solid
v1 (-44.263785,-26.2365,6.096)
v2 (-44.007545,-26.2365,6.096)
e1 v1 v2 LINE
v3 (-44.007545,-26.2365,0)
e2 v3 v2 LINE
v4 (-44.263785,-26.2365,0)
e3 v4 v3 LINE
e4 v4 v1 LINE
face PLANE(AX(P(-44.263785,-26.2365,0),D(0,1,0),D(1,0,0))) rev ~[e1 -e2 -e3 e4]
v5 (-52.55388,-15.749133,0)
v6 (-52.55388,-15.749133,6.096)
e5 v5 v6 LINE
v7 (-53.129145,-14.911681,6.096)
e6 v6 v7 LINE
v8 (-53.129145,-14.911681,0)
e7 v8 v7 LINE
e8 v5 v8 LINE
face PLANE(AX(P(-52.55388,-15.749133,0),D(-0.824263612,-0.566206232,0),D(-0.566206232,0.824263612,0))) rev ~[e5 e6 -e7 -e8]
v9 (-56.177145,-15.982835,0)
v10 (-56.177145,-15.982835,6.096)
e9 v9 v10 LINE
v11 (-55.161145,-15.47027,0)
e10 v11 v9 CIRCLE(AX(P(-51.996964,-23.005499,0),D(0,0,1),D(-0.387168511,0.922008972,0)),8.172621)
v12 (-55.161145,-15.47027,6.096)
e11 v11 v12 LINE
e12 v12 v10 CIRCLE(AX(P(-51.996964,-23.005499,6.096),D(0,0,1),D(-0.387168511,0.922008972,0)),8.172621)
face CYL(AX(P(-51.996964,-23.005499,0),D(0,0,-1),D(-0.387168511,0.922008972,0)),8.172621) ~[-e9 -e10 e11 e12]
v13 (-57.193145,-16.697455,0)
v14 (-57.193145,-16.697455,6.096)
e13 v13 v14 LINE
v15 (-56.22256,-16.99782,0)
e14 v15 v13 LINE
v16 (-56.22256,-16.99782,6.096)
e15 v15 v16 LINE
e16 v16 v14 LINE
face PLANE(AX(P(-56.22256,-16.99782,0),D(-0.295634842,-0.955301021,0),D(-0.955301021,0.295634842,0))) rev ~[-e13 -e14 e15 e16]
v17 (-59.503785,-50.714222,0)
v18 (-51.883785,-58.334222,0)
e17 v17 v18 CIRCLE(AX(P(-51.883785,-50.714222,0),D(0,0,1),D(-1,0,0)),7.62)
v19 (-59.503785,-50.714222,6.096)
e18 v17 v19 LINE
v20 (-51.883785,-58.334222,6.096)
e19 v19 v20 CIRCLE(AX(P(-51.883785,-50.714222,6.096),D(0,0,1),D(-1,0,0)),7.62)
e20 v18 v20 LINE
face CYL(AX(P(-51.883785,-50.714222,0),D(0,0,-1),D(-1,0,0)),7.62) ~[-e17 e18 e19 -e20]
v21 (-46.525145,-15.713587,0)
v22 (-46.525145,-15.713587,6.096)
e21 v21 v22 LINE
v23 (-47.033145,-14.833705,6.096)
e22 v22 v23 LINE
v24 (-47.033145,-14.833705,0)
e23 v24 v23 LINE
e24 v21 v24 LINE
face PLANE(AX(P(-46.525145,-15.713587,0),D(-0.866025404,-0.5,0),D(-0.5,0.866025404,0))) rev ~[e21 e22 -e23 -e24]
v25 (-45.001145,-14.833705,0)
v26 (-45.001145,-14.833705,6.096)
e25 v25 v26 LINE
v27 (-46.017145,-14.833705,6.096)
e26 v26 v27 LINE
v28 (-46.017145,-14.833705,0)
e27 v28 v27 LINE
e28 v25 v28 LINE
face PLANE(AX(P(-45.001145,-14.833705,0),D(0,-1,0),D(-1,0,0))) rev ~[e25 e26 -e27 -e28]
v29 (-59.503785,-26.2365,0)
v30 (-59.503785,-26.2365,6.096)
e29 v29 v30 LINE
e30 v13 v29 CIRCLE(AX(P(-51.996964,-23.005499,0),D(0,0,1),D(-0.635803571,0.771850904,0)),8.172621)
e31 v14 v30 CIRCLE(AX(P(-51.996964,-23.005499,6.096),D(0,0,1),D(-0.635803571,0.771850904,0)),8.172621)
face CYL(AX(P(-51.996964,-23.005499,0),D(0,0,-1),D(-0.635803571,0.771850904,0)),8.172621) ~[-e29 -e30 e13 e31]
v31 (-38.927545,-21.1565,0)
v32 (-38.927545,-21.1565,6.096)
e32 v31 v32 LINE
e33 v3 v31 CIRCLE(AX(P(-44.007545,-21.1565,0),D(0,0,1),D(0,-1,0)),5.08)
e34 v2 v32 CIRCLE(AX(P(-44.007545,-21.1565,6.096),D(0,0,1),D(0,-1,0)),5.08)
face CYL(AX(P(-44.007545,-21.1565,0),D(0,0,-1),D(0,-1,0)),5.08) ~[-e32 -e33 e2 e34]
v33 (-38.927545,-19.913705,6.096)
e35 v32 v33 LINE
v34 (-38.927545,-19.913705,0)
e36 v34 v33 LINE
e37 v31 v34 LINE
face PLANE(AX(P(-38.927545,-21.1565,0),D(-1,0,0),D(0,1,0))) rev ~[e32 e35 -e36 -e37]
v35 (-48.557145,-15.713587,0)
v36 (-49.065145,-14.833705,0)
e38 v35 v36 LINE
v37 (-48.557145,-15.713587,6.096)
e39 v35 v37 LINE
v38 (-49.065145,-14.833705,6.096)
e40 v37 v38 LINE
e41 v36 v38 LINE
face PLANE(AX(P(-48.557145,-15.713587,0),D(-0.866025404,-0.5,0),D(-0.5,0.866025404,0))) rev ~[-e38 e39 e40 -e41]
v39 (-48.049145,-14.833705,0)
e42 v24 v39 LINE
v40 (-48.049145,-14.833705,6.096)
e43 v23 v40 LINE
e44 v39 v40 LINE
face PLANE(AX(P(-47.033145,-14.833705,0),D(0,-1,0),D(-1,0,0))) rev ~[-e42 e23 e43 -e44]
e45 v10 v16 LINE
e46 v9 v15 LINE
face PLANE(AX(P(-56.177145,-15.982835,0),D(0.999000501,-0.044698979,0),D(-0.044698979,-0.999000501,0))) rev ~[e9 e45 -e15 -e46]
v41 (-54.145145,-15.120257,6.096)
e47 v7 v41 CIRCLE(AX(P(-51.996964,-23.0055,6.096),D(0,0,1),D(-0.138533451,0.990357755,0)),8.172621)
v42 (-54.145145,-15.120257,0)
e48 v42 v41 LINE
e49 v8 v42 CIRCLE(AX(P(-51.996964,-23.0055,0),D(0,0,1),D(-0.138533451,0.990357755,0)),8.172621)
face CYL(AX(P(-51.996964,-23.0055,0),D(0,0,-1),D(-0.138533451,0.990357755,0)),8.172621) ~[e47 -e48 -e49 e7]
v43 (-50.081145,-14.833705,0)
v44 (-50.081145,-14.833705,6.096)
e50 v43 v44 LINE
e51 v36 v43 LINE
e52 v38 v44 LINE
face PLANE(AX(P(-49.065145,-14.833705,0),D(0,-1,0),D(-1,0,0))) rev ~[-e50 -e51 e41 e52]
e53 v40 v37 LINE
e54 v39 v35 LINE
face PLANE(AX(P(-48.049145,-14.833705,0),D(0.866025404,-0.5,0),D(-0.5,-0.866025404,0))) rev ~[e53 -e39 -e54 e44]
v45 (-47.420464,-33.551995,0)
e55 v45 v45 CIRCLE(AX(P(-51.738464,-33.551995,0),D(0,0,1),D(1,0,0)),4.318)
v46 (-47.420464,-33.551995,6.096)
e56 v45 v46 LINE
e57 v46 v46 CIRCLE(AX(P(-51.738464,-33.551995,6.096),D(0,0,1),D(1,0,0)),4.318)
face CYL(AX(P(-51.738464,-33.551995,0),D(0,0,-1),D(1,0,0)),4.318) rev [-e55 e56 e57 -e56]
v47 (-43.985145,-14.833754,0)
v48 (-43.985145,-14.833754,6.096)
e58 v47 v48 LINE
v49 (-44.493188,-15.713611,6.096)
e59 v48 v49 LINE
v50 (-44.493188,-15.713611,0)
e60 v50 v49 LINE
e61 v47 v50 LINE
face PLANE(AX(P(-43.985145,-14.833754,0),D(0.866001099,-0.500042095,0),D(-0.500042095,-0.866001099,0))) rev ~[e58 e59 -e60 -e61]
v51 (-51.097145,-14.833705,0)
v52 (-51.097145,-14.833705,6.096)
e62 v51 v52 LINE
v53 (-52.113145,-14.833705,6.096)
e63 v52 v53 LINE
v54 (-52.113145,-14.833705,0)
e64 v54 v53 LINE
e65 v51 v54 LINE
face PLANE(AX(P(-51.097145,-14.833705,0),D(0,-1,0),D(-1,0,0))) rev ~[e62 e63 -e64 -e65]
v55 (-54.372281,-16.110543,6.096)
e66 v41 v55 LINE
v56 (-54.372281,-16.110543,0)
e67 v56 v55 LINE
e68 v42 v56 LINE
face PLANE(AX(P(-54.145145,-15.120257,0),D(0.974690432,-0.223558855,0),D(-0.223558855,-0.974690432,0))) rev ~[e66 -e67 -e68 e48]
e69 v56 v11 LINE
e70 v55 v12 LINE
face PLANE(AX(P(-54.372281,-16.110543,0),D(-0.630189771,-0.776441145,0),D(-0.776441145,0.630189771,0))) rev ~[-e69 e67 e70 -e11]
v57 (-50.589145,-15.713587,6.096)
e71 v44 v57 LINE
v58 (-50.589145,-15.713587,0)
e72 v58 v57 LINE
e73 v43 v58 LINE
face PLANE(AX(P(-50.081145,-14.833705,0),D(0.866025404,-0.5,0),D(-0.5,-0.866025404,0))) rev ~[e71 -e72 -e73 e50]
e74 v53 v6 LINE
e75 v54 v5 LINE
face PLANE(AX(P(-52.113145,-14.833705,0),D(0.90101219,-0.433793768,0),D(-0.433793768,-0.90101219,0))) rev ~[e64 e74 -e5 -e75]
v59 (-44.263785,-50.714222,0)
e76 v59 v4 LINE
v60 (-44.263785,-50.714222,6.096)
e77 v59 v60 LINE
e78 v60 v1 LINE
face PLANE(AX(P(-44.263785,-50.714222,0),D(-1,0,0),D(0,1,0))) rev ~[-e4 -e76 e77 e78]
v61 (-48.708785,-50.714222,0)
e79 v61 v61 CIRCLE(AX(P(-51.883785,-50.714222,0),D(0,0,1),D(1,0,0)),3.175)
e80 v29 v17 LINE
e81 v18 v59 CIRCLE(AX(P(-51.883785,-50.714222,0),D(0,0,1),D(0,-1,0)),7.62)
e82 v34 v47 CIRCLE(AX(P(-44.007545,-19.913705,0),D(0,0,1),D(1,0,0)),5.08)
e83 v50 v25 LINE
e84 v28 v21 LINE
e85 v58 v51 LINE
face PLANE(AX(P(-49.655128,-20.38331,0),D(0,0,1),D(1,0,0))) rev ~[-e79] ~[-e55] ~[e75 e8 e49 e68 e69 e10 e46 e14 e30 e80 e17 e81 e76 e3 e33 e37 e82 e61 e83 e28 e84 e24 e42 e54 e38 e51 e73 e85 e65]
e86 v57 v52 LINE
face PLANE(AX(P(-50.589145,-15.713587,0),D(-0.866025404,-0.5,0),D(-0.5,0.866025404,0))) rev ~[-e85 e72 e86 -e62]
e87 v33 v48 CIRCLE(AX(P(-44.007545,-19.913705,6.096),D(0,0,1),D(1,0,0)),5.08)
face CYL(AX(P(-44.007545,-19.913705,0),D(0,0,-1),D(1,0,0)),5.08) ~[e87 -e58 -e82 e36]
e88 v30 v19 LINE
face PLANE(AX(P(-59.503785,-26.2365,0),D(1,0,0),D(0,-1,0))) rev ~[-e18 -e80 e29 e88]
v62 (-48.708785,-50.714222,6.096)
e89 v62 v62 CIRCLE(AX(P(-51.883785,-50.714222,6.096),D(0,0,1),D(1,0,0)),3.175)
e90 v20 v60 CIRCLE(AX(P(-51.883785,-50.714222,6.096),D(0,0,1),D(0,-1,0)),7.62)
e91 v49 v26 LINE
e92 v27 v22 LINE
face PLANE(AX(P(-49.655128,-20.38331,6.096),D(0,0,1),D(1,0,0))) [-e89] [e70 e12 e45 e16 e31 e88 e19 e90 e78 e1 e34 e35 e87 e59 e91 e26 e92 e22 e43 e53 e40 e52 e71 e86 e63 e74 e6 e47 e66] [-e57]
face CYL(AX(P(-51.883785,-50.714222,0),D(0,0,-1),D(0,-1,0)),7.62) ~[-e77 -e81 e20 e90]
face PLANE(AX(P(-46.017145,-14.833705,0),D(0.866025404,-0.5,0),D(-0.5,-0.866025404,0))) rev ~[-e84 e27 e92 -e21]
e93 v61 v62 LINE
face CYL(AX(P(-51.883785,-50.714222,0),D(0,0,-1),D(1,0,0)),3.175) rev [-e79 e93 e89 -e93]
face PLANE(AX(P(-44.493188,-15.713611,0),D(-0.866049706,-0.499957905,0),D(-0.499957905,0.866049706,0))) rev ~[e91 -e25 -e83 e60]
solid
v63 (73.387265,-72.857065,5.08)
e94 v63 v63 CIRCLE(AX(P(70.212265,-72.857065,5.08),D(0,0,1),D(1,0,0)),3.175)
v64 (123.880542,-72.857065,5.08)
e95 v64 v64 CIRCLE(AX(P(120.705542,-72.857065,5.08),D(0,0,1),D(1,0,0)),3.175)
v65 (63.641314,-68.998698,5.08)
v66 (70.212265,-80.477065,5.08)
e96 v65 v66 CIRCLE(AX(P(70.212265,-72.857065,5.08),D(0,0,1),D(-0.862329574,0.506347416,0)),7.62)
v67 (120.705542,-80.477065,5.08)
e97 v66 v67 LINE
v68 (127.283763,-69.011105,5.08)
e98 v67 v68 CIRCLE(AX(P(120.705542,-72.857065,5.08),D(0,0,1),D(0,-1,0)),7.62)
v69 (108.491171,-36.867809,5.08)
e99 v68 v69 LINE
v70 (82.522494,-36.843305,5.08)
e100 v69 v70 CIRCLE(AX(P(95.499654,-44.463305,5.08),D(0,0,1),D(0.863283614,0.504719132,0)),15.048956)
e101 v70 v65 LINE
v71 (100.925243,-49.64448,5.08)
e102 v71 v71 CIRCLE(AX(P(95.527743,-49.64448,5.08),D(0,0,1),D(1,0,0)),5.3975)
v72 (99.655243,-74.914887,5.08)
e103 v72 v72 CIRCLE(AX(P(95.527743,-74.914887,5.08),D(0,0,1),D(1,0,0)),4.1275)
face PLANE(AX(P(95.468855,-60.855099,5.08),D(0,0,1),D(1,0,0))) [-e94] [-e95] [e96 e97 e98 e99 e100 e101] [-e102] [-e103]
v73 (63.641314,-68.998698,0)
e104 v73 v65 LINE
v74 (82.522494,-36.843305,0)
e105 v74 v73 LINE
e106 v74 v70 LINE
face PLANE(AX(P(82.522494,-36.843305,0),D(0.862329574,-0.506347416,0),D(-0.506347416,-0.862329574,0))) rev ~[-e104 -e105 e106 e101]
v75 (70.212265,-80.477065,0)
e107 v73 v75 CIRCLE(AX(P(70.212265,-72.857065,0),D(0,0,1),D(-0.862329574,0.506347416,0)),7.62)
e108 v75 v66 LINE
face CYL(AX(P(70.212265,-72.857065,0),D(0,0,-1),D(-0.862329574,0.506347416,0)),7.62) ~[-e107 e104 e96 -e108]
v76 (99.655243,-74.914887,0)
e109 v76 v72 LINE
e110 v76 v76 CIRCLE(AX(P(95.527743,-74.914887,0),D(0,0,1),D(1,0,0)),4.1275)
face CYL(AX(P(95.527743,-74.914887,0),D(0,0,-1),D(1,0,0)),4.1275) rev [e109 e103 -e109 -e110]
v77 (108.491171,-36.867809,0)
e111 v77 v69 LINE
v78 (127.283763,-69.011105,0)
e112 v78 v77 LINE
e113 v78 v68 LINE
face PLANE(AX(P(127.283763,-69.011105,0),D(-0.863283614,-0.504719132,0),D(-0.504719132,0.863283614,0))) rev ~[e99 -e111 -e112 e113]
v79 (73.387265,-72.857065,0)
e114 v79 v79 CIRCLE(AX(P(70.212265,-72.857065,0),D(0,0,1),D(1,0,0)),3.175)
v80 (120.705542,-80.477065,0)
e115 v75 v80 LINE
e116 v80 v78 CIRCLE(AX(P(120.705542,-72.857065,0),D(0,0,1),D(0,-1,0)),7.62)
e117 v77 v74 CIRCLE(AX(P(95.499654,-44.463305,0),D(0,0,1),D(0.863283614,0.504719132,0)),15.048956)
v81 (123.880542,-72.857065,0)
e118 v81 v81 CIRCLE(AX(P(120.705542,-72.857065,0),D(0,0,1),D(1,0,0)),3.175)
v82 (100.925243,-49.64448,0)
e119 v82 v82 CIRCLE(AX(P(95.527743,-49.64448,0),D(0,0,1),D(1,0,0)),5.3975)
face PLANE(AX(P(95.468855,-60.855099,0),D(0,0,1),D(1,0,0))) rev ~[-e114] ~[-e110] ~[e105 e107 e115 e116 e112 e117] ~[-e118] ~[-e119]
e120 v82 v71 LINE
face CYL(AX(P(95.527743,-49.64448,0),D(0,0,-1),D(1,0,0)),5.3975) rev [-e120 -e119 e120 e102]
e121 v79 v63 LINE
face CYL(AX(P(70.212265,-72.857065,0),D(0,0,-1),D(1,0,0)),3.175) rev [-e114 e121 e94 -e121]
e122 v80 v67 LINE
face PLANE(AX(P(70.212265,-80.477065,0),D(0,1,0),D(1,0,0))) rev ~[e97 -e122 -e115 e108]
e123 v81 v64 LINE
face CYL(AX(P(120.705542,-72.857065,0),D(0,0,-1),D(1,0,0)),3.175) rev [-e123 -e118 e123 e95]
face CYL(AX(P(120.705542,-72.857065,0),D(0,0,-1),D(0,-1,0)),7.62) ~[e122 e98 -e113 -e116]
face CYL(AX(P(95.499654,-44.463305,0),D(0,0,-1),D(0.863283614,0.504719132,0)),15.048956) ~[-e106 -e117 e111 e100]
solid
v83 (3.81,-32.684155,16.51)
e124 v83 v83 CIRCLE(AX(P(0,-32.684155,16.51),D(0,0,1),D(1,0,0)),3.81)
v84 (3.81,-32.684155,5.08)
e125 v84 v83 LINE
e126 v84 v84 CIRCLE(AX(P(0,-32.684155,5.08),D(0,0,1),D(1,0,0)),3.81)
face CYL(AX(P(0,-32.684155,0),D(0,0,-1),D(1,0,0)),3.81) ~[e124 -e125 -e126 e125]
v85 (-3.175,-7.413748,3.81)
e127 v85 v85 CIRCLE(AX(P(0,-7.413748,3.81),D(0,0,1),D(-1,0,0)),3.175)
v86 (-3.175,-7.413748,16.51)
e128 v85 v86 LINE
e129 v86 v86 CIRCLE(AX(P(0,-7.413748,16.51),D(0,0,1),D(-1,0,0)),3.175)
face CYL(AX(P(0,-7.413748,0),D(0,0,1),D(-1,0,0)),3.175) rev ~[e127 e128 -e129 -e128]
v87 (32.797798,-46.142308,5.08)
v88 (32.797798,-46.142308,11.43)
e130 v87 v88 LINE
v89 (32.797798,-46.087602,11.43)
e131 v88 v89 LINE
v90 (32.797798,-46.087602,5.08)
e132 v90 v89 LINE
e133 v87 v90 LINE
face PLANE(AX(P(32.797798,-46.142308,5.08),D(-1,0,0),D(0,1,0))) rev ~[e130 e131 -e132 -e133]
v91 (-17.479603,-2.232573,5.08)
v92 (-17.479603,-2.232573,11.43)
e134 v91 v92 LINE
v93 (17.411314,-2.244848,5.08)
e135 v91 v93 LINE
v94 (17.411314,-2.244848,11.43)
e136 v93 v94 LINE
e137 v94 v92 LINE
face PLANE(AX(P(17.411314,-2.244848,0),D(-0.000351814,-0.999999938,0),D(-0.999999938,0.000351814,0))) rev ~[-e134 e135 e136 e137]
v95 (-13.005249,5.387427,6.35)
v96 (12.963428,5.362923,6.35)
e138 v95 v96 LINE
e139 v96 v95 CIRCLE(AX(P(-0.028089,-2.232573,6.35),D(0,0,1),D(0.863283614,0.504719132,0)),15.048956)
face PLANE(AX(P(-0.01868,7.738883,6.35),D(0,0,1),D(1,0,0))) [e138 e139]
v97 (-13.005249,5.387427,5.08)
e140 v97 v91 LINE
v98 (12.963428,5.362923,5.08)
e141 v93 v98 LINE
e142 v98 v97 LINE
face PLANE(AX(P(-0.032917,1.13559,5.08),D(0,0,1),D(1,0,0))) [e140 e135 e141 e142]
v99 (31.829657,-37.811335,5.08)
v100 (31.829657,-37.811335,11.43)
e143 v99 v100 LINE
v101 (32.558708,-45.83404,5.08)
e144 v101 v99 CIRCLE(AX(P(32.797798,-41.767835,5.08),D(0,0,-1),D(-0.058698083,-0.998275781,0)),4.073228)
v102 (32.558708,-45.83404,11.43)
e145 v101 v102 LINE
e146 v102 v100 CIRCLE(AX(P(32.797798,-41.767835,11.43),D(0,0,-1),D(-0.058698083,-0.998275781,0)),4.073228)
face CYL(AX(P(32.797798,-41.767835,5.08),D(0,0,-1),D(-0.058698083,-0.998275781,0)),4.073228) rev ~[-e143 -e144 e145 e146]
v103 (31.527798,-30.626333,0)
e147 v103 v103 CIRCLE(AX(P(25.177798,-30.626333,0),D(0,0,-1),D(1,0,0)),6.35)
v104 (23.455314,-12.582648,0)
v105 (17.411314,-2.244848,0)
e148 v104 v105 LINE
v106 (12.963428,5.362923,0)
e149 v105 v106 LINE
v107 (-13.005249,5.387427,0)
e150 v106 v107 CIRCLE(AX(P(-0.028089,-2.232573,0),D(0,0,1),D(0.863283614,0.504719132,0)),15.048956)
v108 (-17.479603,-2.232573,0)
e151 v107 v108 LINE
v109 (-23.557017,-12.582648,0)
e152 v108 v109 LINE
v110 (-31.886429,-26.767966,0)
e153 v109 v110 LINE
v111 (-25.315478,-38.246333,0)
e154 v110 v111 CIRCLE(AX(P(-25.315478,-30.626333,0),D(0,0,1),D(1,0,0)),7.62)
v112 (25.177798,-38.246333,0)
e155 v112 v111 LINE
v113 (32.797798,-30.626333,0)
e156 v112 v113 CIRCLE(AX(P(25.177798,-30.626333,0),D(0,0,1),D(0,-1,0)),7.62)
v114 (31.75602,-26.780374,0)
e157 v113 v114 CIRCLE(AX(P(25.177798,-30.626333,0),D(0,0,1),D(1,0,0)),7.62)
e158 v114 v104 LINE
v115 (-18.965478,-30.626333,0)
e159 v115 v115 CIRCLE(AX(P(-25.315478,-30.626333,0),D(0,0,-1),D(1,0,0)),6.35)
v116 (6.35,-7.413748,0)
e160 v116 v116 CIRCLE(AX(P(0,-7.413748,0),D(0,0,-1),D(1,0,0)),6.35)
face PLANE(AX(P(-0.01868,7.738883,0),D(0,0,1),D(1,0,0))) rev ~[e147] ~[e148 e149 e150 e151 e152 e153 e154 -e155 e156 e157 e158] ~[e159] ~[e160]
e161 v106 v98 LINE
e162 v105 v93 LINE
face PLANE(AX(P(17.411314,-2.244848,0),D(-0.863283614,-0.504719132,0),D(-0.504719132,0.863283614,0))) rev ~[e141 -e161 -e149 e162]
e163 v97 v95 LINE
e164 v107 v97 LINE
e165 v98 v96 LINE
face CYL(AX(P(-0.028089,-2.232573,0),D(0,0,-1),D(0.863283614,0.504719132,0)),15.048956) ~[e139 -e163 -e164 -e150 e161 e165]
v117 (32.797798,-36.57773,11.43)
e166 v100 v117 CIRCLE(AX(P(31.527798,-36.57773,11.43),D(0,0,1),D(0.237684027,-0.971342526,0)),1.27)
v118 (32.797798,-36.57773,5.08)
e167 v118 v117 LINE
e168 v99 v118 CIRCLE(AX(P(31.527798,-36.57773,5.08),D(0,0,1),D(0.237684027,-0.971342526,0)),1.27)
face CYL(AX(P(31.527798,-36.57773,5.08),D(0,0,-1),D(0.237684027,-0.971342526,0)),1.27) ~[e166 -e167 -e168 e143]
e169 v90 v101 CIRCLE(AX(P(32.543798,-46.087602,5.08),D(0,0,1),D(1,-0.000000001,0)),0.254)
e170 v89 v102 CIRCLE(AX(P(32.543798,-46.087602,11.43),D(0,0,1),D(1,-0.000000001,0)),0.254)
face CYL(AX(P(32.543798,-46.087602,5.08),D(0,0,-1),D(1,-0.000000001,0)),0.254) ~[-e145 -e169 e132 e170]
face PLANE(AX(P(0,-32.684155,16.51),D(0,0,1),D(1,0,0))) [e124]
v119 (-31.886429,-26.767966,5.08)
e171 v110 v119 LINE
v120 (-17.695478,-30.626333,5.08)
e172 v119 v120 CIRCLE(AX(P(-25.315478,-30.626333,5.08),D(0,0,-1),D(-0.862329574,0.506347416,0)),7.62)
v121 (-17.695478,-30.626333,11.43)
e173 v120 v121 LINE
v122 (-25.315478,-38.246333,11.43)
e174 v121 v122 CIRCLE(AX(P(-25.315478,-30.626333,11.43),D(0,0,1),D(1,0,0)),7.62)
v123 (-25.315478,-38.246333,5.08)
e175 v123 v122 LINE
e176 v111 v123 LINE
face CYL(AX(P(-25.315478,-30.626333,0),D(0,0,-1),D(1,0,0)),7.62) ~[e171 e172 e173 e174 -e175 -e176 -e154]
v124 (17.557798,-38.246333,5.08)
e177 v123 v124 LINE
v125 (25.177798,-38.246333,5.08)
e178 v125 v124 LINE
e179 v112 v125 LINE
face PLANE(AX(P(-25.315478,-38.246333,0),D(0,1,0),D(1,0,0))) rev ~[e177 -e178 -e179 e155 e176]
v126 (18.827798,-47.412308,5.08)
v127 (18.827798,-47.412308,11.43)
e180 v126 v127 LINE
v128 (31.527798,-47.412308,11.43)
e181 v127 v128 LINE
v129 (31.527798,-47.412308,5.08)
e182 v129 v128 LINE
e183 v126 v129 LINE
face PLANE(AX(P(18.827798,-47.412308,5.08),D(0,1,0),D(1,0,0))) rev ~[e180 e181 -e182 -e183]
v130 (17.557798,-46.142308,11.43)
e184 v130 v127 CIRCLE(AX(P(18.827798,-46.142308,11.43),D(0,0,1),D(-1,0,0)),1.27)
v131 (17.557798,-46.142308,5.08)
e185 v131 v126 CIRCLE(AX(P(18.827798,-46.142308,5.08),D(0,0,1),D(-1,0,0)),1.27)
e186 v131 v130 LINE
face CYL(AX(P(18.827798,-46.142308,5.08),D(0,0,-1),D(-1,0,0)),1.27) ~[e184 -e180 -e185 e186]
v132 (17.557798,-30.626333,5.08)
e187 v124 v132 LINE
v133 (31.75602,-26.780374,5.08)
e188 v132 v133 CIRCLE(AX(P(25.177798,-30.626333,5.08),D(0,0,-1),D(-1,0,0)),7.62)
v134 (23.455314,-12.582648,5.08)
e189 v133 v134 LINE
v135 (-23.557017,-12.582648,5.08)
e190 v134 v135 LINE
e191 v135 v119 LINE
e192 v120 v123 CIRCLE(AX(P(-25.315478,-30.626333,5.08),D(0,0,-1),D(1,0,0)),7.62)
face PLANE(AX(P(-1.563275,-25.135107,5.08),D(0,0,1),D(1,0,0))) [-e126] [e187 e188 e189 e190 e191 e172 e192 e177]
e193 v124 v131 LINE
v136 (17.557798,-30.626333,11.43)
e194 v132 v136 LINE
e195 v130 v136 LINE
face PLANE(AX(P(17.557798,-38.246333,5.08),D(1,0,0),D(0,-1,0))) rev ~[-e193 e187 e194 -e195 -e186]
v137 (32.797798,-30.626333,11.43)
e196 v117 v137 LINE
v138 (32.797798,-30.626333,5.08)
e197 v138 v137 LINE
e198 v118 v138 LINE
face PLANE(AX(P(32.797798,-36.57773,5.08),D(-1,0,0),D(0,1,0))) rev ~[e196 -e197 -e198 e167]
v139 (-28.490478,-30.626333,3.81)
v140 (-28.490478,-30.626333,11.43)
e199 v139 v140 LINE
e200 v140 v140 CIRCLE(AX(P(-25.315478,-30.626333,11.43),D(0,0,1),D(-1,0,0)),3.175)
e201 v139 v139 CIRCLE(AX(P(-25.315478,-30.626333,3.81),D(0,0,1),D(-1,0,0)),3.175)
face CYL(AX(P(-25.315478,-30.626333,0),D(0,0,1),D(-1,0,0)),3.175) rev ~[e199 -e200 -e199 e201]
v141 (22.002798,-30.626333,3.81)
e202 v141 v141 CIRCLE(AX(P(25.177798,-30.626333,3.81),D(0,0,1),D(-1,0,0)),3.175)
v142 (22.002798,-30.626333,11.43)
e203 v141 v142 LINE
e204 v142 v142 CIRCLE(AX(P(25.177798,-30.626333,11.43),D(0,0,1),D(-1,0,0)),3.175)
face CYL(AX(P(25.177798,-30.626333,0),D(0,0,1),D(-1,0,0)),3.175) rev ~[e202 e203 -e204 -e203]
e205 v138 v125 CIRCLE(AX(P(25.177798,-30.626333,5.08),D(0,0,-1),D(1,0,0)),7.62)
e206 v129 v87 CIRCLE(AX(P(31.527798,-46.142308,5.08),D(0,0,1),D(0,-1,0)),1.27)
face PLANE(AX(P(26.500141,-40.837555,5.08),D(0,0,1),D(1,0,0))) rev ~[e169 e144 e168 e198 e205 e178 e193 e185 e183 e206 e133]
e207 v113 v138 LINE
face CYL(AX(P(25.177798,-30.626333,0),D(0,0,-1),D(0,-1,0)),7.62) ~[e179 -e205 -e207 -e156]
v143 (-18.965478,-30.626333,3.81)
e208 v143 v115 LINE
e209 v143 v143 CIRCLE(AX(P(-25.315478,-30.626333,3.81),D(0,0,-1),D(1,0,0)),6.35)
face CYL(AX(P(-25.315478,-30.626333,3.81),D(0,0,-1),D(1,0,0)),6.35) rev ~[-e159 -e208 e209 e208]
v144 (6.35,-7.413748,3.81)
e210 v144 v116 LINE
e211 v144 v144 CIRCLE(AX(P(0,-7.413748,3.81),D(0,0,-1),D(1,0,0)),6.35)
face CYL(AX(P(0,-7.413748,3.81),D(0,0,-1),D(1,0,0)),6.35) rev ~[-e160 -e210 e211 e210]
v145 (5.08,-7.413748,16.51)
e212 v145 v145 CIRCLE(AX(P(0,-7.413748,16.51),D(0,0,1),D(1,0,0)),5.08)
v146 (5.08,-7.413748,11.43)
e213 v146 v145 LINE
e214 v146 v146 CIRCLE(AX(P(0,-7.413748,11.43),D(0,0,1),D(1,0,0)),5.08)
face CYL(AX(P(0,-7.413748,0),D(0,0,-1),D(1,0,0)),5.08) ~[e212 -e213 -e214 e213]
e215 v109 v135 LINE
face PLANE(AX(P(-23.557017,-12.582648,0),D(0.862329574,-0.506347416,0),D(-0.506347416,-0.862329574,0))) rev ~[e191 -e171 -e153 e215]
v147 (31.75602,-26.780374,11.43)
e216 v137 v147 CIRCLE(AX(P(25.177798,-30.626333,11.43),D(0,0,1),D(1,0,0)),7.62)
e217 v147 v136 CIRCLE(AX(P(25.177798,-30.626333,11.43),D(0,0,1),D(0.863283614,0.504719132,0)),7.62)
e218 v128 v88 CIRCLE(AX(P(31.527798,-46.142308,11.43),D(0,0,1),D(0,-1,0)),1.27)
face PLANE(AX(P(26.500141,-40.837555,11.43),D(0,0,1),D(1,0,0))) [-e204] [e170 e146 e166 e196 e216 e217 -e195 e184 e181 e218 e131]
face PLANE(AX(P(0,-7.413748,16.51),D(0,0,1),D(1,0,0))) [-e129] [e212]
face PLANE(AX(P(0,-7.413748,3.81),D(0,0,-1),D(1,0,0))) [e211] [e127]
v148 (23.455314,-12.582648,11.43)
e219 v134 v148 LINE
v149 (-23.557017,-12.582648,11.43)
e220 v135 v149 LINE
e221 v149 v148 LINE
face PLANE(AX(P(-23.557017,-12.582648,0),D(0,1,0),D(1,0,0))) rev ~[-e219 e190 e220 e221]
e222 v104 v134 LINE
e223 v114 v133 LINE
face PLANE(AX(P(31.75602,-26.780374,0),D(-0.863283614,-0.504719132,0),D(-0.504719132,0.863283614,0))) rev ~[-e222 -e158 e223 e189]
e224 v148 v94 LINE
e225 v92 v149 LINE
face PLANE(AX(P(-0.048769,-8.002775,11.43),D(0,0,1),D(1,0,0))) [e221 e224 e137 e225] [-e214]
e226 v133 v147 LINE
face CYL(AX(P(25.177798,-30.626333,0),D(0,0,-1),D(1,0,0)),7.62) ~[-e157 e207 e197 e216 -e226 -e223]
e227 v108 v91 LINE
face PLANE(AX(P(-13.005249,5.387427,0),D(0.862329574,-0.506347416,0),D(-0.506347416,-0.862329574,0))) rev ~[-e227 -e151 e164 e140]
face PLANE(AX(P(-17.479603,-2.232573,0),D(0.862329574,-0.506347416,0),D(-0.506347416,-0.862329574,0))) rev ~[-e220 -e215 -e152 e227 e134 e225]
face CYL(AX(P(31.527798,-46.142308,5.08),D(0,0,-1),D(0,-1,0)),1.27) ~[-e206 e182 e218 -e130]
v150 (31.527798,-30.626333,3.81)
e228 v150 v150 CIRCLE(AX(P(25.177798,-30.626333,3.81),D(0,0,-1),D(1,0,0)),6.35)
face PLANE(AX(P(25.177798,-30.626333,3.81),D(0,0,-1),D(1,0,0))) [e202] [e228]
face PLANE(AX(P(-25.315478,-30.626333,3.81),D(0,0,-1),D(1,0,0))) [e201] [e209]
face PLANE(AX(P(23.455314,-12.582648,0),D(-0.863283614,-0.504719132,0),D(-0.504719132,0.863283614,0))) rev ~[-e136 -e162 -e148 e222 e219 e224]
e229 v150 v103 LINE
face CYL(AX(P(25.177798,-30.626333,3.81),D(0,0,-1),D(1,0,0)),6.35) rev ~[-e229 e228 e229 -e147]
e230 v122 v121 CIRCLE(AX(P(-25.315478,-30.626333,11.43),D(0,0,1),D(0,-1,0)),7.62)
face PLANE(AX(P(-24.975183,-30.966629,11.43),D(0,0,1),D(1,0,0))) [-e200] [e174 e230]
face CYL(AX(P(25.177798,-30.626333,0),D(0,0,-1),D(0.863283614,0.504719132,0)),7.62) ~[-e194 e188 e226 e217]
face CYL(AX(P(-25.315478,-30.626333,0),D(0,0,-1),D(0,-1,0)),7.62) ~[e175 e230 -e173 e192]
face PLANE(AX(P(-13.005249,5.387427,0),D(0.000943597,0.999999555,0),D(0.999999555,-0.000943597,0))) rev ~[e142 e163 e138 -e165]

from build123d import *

# Parameters (mm, degrees)
F0_R            = 3.81
F2_DEPTH        = 5.08
F0_R_2          = 5.08
F0_R_3          = 3.175
F3_DEPTH        = 11.43
F4_DEPTH        = 16.51
F5_DEPTH        = 6.35
F6_START        = 5.08
F6_DEPTH        = 6.35
F1_R            = 3.175
F1_R_2          = 4.318
F7_DEPTH        = 6.096
F8_R            = 3.175
F8_R_2          = 4.1275
F8_R_3          = 5.3975
F9_DEPTH        = 5.08
F10_D           = 6.35
F10_CBORE_D     = 12.7
F10_CBORE_DEPTH = 3.81


# Not quite as in the source:
# - a feature names something its author has since deleted; it is built from what else it names


with BuildPart() as f2:
    # F0 (on Top) → F2 (new body)
    with BuildSketch(Plane.XY):
        with BuildLine():
            ThreePointArc((-17.6954780992, -30.626333441), (-19.9273244266, -36.0144871136), (-25.3154780992, -38.246333441))
            Line((-25.3154780992, -38.246333441), (17.5577984688, -38.246333441))
            Line((17.5577984688, -38.246333441), (17.5577984688, -30.626333441))
            ThreePointArc((17.5577984688, -30.626333441), (23.1855190024, -23.271387994), (31.7560196047, -26.7803736534))
            Line((31.7560196047, -26.7803736534), (23.4553135122, -12.5826484363))
            Line((23.4553135122, -12.5826484363), (-23.5570166859, -12.5826484363))
            Line((-23.5570166859, -12.5826484363), (-31.8864294526, -26.7679661294))
            ThreePointArc((-31.8864294526, -26.7679661294), (-23.3162594159, -23.2732711771), (-17.6954780992, -30.626333441))
        make_face()
        with Locations((0, -32.6841548085)):
            Circle(F0_R, mode=Mode.SUBTRACT)
        with BuildLine():
            Line((17.5577984688, -30.626333441), (17.5577984688, -38.246333441))
            Line((17.5577984688, -38.246333441), (25.1777984688, -38.246333441))
            ThreePointArc((25.1777984688, -38.246333441), (19.7896447962, -36.0144871136), (17.5577984688, -30.626333441))
        make_face()
    extrude(amount=F2_DEPTH)



with BuildPart() as f2b:
    # F0 (on Top) → F2, piece 2 (new body)
    with BuildSketch(Plane.XY):
        Polygon((-13.0052492681, 5.3874266745), (-17.4796027267, -2.2325733255), (17.4113143411, -2.2448484363), (12.9634277073, 5.3629227003), align=None)
    extrude(amount=F2_DEPTH)


with BuildPart() as f2_1:
    add(f2.part)

    add(f2b.part)  # F3 merges F2b
    # F0 (on Top) → F3 (join)
    with BuildSketch(Plane.XY):
        Polygon((-17.4796027267, -2.2325733255), (-23.5570166859, -12.5826484363), (23.4553135122, -12.5826484363), (17.4113143411, -2.2448484363), align=None)
        with Locations((0, -7.4137484363)):
            Circle(F0_R_2, mode=Mode.SUBTRACT)
        with BuildLine():
            ThreePointArc((-31.8864294526, -26.7679661294), (-31.9285393765, -34.4120725422), (-25.3154780992, -38.246333441))
            ThreePointArc((-25.3154780992, -38.246333441), (-19.9273244266, -36.0144871136), (-17.6954780992, -30.626333441))
            ThreePointArc((-17.6954780992, -30.626333441), (-23.3162594159, -23.2732711771), (-31.8864294526, -26.7679661294))
        make_face()
        with Locations((-25.3154780992, -30.626333441)):
            Circle(F0_R_3, mode=Mode.SUBTRACT)
        with BuildLine():
            ThreePointArc((17.5577984688, -30.626333441), (19.7896447962, -36.0144871136), (25.1777984688, -38.246333441))
            ThreePointArc((25.1777984688, -38.246333441), (30.5659521415, -36.0144871136), (32.7977984688, -30.626333441))
            ThreePointArc((32.7977984688, -30.626333441), (32.5327439158, -28.6340539746), (31.7560196047, -26.7803736534))
            ThreePointArc((31.7560196047, -26.7803736534), (23.1855190024, -23.271387994), (17.5577984688, -30.626333441))
        make_face()
        with Locations((25.1777984688, -30.626333441)):
            Circle(F0_R_3, mode=Mode.SUBTRACT)
        with BuildLine():
            Line((17.5577984688, -30.626333441), (17.5577984688, -38.246333441))
            Line((17.5577984688, -38.246333441), (25.1777984688, -38.246333441))
            ThreePointArc((25.1777984688, -38.246333441), (19.7896447962, -36.0144871136), (17.5577984688, -30.626333441))
        make_face()
        with Locations((25.1777984688, -30.626333441)):
            Circle(F0_R_3)
        with Locations((-25.3154780992, -30.626333441)):
            Circle(F0_R_3)
    extrude(amount=F3_DEPTH)

    # F0 (on Top) → F4 (join)
    with BuildSketch(Plane.XY):
        with Locations((0, -32.6841548085)):
            Circle(F0_R)
        with Locations((0, -7.4137484363)):
            Circle(F0_R_2)
        with Locations((0, -7.4137484363)):
            Circle(F0_R_3, mode=Mode.SUBTRACT)
        with Locations((0, -7.4137484363)):
            Circle(F0_R_3)
    extrude(amount=F4_DEPTH)

    # F0 (on Top) → F5 (join)
    with BuildSketch(Plane.XY):
        with BuildLine():
            ThreePointArc((12.9634277073, 5.3629227003), (-0.0138892827, 12.8163759997), (-13.0052492681, 5.3874266745))
            Line((-13.0052492681, 5.3874266745), (12.9634277073, 5.3629227003))
        make_face()
    extrude(amount=F5_DEPTH)

    # F0 (on Top) → F6 (join)
    with BuildSketch(Plane.XY.offset(F6_START)):
        with BuildLine():
            Line((25.1777984688, -38.246333441), (17.5577984688, -38.246333441))
            Line((17.5577984688, -38.246333441), (17.5577984688, -46.1423077567))
            ThreePointArc((17.5577984688, -46.1423077567), (17.9297728567, -47.0403333688), (18.8277984688, -47.4123077567))
            Line((18.8277984688, -47.4123077567), (31.5277984688, -47.4123077567))
            ThreePointArc((31.5277984688, -47.4123077567), (32.4258240809, -47.0403333688), (32.7977984688, -46.1423077567))
            Line((32.7977984688, -46.1423077567), (32.7977984688, -46.0876021411))
            ThreePointArc((32.7977984688, -46.0876021411), (32.7285996668, -45.9133479668), (32.5587077819, -45.8340400927))
            ThreePointArc((32.5587077819, -45.8340400927), (28.7412851246, -42.1364642502), (31.8296571838, -37.8113352487))
            ThreePointArc((31.8296571838, -37.8113352487), (32.5268631734, -37.3618027602), (32.7977984688, -36.5777302406))
            Line((32.7977984688, -36.5777302406), (32.7977984688, -30.626333441))
            ThreePointArc((32.7977984688, -30.626333441), (30.5659521415, -36.0144871136), (25.1777984688, -38.246333441))
        make_face()
    extrude(amount=F6_DEPTH)

    # F10 (through all)
    with Locations(Plane(origin=(0, 0, 0), x_dir=(1, 0, 0), z_dir=(0, 0, -1))):
        with Locations((-25.3154780992, 30.626333441), (25.1777984688, 30.626333441), (0, 7.4137484363)):
            CounterBoreHole(F10_D / 2, F10_CBORE_D / 2, F10_CBORE_DEPTH)


with BuildPart() as f7:
    # F1 (on face) → F7 (new body)
    with BuildSketch(Plane.XY):
        with BuildLine():
            ThreePointArc((-57.1931454593, -16.6974549338), (-59.9398799438, -21.0814893724), (-59.5037853794, -26.2364995391))
            Line((-59.5037853794, -26.2364995391), (-44.4651611469, -26.2364995391))
            Line((-44.4651611469, -26.2364995391), (-44.2637853794, -26.2364995391))
            Line((-44.2637853794, -26.2364995391), (-44.0075451514, -26.2364995391))
            ThreePointArc((-44.0075451514, -26.2364995391), (-40.415442703, -24.7486019875), (-38.9275451514, -21.1564995391))
            Line((-38.9275451514, -21.1564995391), (-38.9275451514, -19.9137048024))
            ThreePointArc((-38.9275451514, -19.9137048024), (-40.4075319267, -16.3295305904), (-43.9851454593, -14.8337541872))
            Line((-43.9851454593, -14.8337541872), (-44.4931882277, -15.7136113037))
            Line((-44.4931882277, -15.7136113037), (-45.0011454593, -14.8337048024))
            Line((-45.0011454593, -14.8337048024), (-46.0171454593, -14.8337048024))
            Line((-46.0171454593, -14.8337048024), (-46.5251454593, -15.7135866127))
            Line((-46.5251454593, -15.7135866127), (-47.0331454593, -14.8337048024))
            Line((-47.0331454593, -14.8337048024), (-48.0491454593, -14.8337048024))
            Line((-48.0491454593, -14.8337048024), (-48.5571454593, -15.7135866127))
            Line((-48.5571454593, -15.7135866127), (-49.0651454593, -14.8337048024))
            Line((-49.0651454593, -14.8337048024), (-50.0811454593, -14.8337048024))
            Line((-50.0811454593, -14.8337048024), (-50.5891454593, -15.7135866127))
            Line((-50.5891454593, -15.7135866127), (-51.0971454593, -14.8337048024))
            Line((-51.0971454593, -14.8337048024), (-51.7384644685, -14.8337048024))
            Line((-51.7384644685, -14.8337048024), (-52.1131454593, -14.8337048024))
            Line((-52.1131454593, -14.8337048024), (-52.5538799272, -15.7491331879))
            Line((-52.5538799272, -15.7491331879), (-53.1291454593, -14.9116813579))
            ThreePointArc((-53.1291454593, -14.9116813579), (-53.6404575982, -14.9998355114), (-54.1451454593, -15.120257357))
            Line((-54.1451454593, -15.120257357), (-54.3722812556, -16.1105428361))
            Line((-54.3722812556, -16.1105428361), (-55.1611454593, -15.4702700285))
            ThreePointArc((-55.1611454593, -15.4702700285), (-55.6780776214, -15.7088475189), (-56.1771454593, -15.9828354243))
            Line((-56.1771454593, -15.9828354243), (-56.2225596223, -16.9978199334))
            Line((-56.2225596223, -16.9978199334), (-57.1931454593, -16.6974549338))
        make_face()
        with BuildLine():
            Line((-44.4651611469, -26.2364995391), (-59.5037853794, -26.2364995391))
            Line((-59.5037853794, -26.2364995391), (-59.5037853794, -50.714222083))
            ThreePointArc((-59.5037853794, -50.714222083), (-57.271939052, -56.1023757557), (-51.8837853794, -58.334222083))
            ThreePointArc((-51.8837853794, -58.334222083), (-46.4956317067, -56.1023757557), (-44.2637853794, -50.714222083))
            Line((-44.2637853794, -50.714222083), (-44.2637853794, -26.2364995391))
            Line((-44.2637853794, -26.2364995391), (-44.4651611469, -26.2364995391))
        make_face()
        with Locations((-51.8837853794, -50.714222083)):
            Circle(F1_R, mode=Mode.SUBTRACT)
        with Locations((-51.7384644685, -33.5519946396)):
            Circle(F1_R_2, mode=Mode.SUBTRACT)
    extrude(amount=F7_DEPTH)


with BuildPart() as f9:
    # F8 (on Top) → F9 (new body)
    with BuildSketch(Plane.XY):
        with BuildLine():
            ThreePointArc((63.6413138902, -68.9986979613), (63.5992039663, -76.6428043742), (70.2122652436, -80.4770652729))
            Line((70.2122652436, -80.4770652729), (120.7055418116, -80.4770652729))
            ThreePointArc((120.7055418116, -80.4770652729), (127.3150279331, -76.649042753), (127.2837629474, -69.0111054854))
            Line((127.2837629474, -69.0111054854), (108.4911710501, -36.8678091316))
            ThreePointArc((108.4911710501, -36.8678091316), (95.5138540601, -29.4143558323), (82.5224940747, -36.8433051574))
            Line((82.5224940747, -36.8433051574), (63.6413138902, -68.9986979613))
        make_face()
        with Locations((70.2122652436, -72.8570652729)):
            Circle(F8_R, mode=Mode.SUBTRACT)
        with Locations((95.5277433428, -74.9148866405)):
            Circle(F8_R_2, mode=Mode.SUBTRACT)
        with Locations((120.7055418116, -72.8570652729)):
            Circle(F8_R, mode=Mode.SUBTRACT)
        with Locations((95.5277433428, -49.6444802682)):
            Circle(F8_R_3, mode=Mode.SUBTRACT)
    extrude(amount=F9_DEPTH)


solid = Compound([f2_1.part, f7.part, f9.part])
